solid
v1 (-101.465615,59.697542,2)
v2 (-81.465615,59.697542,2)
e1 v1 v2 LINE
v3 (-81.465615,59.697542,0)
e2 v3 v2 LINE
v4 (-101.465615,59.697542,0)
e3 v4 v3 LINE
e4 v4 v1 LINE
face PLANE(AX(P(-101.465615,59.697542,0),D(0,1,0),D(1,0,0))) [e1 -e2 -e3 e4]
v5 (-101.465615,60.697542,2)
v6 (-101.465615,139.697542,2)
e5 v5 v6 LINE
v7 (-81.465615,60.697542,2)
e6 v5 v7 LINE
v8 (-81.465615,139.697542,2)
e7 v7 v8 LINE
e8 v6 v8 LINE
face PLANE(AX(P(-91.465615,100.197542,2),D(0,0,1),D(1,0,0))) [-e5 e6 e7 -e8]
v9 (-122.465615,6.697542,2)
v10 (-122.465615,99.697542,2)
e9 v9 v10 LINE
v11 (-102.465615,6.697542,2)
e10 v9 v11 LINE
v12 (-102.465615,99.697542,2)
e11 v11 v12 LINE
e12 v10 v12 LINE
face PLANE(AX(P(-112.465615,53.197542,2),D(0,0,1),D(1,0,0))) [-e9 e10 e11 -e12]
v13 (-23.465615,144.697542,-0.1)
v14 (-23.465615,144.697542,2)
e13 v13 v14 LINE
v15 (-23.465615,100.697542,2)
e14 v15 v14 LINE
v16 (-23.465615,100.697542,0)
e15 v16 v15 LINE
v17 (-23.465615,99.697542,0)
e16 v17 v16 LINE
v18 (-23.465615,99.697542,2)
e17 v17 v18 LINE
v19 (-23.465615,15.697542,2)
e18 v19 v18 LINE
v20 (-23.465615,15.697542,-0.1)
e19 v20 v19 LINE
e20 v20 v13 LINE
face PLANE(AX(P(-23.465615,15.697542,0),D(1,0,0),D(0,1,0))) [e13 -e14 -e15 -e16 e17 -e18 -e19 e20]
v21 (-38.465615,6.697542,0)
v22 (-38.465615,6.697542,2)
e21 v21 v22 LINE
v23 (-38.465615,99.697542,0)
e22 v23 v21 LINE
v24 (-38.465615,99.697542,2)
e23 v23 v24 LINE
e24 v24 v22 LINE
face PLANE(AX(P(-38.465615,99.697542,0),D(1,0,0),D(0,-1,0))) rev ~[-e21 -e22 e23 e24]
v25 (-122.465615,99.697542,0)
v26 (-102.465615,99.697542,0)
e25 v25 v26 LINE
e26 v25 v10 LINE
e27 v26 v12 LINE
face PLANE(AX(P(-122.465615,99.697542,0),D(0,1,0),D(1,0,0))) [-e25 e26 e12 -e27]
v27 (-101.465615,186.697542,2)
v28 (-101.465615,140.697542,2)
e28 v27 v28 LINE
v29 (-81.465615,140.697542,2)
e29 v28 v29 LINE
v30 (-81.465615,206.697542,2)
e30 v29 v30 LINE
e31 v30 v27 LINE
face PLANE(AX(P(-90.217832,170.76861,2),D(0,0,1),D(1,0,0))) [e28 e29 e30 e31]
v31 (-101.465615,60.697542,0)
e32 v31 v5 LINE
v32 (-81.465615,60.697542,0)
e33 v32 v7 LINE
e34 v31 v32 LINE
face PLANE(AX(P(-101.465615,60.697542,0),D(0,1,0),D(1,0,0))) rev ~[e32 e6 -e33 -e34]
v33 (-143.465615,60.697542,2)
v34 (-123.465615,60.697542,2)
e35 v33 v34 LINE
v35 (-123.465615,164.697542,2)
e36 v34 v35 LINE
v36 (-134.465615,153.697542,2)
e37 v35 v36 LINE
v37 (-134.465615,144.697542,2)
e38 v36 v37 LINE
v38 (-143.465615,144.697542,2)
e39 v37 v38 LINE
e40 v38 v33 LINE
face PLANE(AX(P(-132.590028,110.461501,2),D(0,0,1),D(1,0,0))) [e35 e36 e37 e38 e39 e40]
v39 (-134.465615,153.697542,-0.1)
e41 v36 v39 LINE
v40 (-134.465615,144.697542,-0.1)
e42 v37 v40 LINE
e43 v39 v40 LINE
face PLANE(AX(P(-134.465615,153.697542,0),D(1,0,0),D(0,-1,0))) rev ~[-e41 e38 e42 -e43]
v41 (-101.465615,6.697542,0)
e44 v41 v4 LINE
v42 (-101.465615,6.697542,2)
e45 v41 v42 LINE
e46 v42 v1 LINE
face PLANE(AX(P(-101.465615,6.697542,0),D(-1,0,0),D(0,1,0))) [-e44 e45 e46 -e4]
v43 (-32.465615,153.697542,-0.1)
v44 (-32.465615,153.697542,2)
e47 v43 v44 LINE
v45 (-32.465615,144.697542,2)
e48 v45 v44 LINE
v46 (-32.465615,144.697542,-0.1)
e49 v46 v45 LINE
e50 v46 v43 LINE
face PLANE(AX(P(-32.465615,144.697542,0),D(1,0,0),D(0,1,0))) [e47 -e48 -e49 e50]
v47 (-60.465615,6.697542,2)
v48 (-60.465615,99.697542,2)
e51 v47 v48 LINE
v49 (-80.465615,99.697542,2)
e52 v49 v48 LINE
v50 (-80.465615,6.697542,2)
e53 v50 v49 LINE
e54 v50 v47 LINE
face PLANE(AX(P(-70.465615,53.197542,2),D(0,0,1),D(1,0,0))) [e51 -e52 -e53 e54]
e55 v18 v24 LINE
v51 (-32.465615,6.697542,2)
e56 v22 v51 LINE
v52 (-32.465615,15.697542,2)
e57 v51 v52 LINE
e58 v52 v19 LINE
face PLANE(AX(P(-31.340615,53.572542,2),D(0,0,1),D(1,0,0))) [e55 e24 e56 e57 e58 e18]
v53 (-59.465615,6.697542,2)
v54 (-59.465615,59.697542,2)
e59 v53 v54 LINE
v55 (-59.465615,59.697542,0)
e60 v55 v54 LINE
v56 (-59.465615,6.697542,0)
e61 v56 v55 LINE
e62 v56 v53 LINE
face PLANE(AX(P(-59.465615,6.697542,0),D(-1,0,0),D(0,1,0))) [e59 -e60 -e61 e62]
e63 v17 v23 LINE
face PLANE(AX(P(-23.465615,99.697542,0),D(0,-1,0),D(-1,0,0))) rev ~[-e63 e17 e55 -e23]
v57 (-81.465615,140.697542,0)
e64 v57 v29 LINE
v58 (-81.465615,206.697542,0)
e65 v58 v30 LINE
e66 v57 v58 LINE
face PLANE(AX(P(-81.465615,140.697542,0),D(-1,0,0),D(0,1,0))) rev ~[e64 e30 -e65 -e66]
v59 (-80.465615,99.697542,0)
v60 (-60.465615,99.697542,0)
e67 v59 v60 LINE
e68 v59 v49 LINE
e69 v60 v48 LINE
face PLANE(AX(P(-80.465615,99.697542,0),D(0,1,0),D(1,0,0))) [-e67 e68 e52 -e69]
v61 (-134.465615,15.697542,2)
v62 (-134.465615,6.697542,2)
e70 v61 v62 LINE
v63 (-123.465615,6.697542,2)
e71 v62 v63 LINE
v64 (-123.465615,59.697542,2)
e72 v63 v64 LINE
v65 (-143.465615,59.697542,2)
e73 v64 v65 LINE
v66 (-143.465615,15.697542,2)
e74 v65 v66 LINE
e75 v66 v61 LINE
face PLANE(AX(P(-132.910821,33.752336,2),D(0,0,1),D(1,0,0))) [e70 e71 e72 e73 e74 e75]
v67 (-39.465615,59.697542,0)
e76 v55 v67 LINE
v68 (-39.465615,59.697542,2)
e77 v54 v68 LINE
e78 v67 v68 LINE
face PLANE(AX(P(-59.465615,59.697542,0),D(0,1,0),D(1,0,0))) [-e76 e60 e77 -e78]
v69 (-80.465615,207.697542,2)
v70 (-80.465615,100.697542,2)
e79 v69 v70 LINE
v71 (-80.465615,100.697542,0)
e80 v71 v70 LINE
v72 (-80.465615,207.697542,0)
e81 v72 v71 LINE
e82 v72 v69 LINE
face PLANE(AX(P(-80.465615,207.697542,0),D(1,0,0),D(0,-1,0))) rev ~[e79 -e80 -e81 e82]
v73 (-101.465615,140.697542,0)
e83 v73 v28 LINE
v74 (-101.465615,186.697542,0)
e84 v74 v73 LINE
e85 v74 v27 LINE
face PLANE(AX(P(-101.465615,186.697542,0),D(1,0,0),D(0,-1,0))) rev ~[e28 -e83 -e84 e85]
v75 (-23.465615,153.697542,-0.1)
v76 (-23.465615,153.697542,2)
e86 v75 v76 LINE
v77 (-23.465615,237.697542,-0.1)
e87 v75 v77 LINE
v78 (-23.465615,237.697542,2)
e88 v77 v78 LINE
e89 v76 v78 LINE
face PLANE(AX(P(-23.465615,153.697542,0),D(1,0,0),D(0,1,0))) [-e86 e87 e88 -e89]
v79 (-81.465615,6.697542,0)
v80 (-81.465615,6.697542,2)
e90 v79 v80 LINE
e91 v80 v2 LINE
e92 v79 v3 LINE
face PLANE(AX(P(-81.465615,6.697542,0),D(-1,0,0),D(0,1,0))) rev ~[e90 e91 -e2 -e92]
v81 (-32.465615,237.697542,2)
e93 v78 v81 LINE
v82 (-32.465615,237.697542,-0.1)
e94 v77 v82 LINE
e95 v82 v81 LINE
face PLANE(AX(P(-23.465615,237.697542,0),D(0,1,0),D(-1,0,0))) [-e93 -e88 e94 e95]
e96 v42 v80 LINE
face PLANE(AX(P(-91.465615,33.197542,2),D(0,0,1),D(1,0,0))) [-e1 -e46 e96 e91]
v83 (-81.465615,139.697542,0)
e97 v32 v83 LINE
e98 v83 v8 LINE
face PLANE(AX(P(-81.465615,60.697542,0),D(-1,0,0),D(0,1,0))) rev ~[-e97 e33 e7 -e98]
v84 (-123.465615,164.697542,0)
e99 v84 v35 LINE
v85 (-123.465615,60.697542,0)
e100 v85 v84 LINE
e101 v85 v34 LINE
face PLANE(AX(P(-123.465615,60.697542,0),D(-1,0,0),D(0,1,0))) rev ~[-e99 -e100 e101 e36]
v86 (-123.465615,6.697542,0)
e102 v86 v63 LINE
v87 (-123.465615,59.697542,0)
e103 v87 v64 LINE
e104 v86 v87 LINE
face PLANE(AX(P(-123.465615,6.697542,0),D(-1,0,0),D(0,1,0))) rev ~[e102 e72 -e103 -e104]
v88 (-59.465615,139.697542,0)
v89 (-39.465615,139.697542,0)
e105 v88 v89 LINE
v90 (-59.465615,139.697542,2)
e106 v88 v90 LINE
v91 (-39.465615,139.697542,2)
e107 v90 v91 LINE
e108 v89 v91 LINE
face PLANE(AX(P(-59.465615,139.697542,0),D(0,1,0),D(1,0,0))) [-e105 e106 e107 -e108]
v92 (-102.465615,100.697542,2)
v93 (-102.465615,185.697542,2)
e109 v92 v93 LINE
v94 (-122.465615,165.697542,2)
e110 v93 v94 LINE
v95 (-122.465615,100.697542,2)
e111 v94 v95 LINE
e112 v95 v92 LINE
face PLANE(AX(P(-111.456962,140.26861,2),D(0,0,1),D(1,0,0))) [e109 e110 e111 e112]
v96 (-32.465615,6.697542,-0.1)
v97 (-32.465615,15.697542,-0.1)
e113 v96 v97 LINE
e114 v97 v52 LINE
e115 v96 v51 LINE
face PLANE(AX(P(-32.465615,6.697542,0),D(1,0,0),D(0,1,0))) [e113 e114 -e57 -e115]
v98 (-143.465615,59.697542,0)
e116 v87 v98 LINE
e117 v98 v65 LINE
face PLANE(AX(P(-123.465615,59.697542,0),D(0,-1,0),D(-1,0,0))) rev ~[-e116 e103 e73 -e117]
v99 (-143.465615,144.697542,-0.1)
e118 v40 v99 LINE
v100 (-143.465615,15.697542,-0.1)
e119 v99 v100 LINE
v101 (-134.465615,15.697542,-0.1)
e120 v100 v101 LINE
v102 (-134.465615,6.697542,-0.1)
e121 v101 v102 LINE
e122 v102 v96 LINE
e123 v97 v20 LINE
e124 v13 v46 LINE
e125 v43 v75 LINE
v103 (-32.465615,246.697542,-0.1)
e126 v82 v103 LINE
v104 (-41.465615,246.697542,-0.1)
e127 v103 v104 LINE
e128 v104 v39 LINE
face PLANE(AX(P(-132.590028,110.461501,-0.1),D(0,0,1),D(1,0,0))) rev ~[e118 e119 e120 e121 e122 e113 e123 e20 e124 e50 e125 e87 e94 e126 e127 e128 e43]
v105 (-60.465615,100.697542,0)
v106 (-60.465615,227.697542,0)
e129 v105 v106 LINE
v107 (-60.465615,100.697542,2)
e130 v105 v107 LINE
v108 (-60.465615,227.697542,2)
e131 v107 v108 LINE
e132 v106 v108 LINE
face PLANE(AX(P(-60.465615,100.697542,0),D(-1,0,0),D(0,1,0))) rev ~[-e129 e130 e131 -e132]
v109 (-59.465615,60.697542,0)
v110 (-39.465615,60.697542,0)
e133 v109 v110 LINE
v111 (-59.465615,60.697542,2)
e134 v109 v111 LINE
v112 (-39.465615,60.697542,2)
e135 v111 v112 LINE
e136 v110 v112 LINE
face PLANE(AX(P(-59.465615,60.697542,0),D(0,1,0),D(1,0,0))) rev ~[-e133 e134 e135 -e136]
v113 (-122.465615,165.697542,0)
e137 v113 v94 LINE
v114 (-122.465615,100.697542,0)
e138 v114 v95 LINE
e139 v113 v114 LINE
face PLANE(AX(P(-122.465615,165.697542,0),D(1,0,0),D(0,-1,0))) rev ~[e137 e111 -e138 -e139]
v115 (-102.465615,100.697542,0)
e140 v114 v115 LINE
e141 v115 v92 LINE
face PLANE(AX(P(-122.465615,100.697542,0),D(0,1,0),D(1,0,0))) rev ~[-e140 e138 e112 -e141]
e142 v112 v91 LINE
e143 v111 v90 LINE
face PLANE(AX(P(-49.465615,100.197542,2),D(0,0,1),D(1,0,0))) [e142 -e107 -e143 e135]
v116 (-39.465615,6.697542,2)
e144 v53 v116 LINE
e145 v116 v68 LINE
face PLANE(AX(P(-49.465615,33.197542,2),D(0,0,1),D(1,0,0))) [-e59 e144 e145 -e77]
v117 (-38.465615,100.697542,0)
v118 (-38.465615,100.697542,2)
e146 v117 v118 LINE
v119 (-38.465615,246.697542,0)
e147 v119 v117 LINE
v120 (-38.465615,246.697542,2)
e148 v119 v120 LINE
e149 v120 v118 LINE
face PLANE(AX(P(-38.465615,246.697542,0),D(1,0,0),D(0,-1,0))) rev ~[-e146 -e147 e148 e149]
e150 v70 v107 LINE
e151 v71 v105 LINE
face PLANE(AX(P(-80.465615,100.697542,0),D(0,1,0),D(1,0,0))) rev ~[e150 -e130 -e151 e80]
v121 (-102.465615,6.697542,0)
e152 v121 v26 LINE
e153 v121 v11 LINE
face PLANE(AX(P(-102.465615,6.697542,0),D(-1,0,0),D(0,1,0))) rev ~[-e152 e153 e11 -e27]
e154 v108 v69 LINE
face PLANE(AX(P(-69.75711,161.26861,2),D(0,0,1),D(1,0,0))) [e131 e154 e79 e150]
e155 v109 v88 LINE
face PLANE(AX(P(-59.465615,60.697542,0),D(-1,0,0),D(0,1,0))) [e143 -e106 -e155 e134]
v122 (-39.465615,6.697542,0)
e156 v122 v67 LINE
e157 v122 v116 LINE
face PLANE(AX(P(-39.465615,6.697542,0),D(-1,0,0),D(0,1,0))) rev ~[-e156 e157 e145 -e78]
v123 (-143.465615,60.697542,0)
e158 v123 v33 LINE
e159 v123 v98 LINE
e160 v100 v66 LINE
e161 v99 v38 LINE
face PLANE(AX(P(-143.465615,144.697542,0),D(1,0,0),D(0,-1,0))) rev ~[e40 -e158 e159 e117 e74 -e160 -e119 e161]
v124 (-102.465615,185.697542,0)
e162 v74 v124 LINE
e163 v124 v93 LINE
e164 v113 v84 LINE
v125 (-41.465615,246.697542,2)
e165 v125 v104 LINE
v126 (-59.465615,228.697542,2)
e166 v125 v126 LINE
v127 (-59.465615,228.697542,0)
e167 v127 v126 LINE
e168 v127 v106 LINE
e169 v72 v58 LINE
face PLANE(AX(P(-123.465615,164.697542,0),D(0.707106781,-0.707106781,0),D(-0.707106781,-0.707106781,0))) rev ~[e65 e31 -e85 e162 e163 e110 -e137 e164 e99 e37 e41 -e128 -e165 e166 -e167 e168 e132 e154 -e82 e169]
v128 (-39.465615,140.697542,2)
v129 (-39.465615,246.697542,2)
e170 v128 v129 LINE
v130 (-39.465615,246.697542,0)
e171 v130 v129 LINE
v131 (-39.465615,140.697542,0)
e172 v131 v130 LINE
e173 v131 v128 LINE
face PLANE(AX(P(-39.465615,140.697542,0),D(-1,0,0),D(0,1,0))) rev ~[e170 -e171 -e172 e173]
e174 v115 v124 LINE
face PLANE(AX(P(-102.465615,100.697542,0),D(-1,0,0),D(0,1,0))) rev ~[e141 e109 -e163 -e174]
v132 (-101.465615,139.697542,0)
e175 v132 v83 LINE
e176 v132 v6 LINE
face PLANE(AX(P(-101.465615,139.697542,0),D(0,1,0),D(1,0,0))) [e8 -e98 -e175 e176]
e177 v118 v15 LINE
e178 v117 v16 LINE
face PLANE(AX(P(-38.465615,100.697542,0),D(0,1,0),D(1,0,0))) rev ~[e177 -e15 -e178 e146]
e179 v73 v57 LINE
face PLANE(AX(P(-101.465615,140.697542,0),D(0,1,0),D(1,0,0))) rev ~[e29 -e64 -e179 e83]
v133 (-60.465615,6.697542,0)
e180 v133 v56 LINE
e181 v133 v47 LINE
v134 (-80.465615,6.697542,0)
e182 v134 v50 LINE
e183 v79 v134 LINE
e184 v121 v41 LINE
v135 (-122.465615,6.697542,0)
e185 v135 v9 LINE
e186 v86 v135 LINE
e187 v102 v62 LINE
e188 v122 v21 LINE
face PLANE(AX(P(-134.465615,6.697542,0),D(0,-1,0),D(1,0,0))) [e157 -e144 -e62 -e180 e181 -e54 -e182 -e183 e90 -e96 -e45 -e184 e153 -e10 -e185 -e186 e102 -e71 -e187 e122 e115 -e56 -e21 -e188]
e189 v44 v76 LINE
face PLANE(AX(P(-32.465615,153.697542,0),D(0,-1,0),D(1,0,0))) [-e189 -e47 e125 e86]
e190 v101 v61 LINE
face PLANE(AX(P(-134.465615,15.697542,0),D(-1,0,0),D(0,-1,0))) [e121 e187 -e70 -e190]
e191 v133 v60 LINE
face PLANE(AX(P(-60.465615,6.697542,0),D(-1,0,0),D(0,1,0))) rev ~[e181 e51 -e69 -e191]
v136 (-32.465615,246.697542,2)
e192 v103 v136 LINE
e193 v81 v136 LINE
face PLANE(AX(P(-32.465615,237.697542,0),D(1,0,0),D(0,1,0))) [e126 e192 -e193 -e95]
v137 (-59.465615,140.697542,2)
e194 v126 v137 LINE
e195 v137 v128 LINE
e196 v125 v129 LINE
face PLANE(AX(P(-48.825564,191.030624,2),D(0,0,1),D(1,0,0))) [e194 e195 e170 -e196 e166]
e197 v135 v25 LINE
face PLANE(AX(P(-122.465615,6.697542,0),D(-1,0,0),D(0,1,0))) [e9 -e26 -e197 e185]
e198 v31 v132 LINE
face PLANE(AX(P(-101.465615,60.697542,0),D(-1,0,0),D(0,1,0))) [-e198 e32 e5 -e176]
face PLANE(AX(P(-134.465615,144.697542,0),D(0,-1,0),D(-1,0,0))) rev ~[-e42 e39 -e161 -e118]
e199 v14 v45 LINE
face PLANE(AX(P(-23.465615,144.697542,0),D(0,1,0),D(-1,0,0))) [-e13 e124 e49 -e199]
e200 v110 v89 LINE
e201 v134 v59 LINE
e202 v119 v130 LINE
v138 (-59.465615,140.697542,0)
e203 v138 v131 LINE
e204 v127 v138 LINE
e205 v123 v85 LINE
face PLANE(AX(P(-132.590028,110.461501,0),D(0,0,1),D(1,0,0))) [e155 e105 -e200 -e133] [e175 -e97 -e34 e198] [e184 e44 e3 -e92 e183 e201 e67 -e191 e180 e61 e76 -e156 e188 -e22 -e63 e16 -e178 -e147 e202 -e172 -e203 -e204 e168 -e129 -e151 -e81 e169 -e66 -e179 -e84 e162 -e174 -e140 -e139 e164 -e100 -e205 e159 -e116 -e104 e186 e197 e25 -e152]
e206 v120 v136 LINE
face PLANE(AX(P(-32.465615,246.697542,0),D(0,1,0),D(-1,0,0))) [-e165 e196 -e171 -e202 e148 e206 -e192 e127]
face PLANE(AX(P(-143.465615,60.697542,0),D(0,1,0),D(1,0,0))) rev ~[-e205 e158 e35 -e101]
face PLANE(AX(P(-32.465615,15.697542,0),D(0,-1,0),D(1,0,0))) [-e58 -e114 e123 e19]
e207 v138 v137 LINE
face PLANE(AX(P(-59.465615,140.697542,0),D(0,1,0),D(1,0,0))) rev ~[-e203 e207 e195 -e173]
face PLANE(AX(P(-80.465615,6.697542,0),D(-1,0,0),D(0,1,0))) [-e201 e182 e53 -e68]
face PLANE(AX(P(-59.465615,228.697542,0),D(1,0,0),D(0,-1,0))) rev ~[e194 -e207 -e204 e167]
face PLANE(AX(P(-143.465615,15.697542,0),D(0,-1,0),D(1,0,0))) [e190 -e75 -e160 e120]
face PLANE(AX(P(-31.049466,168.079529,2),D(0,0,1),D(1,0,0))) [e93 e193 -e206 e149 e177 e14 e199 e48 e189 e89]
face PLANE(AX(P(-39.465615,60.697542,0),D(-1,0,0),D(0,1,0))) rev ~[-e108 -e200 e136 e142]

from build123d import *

# Parameters (mm, degrees)
F0_W     = 20
F0_H     = 93
F0_H_2   = 79
F0_H_3   = 53
F0_H_4   = 1
F0_W_2   = 15
F0_W_3   = 2
F0_H_5   = 9
F0_W_4   = 1
F0_W_5   = 6
F1_DEPTH = 0.1
F2_DEPTH = 2


# Not quite as in the source:
# - a feature names something its author has since deleted; it is built from what else it names


with BuildPart() as f1:
    # F0 (on Top) → F1 (new body)
    with BuildSketch(Plane.XY):
        Polygon((-134.4656153619, 144.6975417137), (-143.4656153619, 144.6975417137), (-143.4656153619, 104.6975417137), (-143.4656153619, 95.6975417137), (-143.4656153619, 64.6975417137), (-143.4656153619, 60.6975417137), (-123.4656153619, 60.6975417137), (-123.4656153619, 164.6975417137), (-134.4656153619, 153.6975417137), align=None)
        Polygon((-123.4656153619, 6.6975417137), (-123.4656153619, 59.6975417137), (-143.4656153619, 59.6975417137), (-143.4656153619, 55.6975417137), (-143.4656153619, 15.6975417137), (-134.4656153619, 15.6975417137), (-134.4656153619, 6.6975417137), align=None)
        with Locations((-112.4656153619, 53.1975417137)):
            Rectangle(F0_W, F0_H)
        Polygon((-102.4656153619, 185.6975417137), (-122.4656153619, 165.6975417137), (-122.4656153619, 100.6975417137), (-102.4656153619, 100.6975417137), align=None)
        Polygon((-81.4656153619, 140.6975417137), (-81.4656153619, 206.6975417137), (-101.4656153619, 186.6975417137), (-101.4656153619, 140.6975417137), align=None)
        with Locations((-91.4656153619, 100.1975417137)):
            Rectangle(F0_W, F0_H_2)
        with Locations((-91.4656153619, 33.1975417137)):
            Rectangle(F0_W, F0_H_3)
        Polygon((-60.4656153619, 100.6975417137), (-60.4656153619, 227.6975417137), (-80.4656153619, 207.6975417137), (-80.4656153619, 100.6975417137), align=None)
        with Locations((-70.4656153619, 53.1975417137)):
            Rectangle(F0_W, F0_H)
        Polygon((-41.4656153619, 237.6975417137), (-41.4656153619, 246.6975417137), (-59.4656153619, 228.6975417137), (-59.4656153619, 140.6975417137), (-39.4656153619, 140.6975417137), (-39.4656153619, 237.6975417137), align=None)
        with Locations((-49.4656153619, 100.1975417137)):
            Rectangle(F0_W, F0_H_2)
        with Locations((-49.4656153619, 33.1975417137)):
            Rectangle(F0_W, F0_H_3)
        with Locations((-133.4656153619, 60.1975417137)):
            Rectangle(F0_W, F0_H_4)
        Polygon((-122.4656153619, 165.6975417137), (-123.4656153619, 164.6975417137), (-123.4656153619, 60.6975417137), (-123.4656153619, 59.6975417137), (-123.4656153619, 6.6975417137), (-122.4656153619, 6.6975417137), (-122.4656153619, 99.6975417137), (-122.4656153619, 100.6975417137), align=None)
        with Locations((-112.4656153619, 100.1975417137)):
            Rectangle(F0_W, F0_H_4)
        Polygon((-101.4656153619, 186.6975417137), (-102.4656153619, 185.6975417137), (-102.4656153619, 100.6975417137), (-102.4656153619, 99.6975417137), (-102.4656153619, 6.6975417137), (-101.4656153619, 6.6975417137), (-101.4656153619, 59.6975417137), (-101.4656153619, 60.6975417137), (-101.4656153619, 139.6975417137), (-101.4656153619, 140.6975417137), align=None)
        with Locations((-91.4656153619, 140.1975417137)):
            Rectangle(F0_W, F0_H_4)
        Polygon((-80.4656153619, 100.6975417137), (-80.4656153619, 207.6975417137), (-81.4656153619, 206.6975417137), (-81.4656153619, 140.6975417137), (-81.4656153619, 139.6975417137), (-81.4656153619, 60.6975417137), (-81.4656153619, 59.6975417137), (-81.4656153619, 6.6975417137), (-80.4656153619, 6.6975417137), (-80.4656153619, 99.6975417137), align=None)
        with Locations((-70.4656153619, 100.1975417137)):
            Rectangle(F0_W, F0_H_4)
        Polygon((-59.4656153619, 140.6975417137), (-59.4656153619, 228.6975417137), (-60.4656153619, 227.6975417137), (-60.4656153619, 100.6975417137), (-60.4656153619, 99.6975417137), (-60.4656153619, 6.6975417137), (-59.4656153619, 6.6975417137), (-59.4656153619, 59.6975417137), (-59.4656153619, 60.6975417137), (-59.4656153619, 139.6975417137), align=None)
        with Locations((-49.4656153619, 60.1975417137)):
            Rectangle(F0_W, F0_H_4)
        with Locations((-49.4656153619, 140.1975417137)):
            Rectangle(F0_W, F0_H_4)
        with Locations((-91.4656153619, 60.1975417137)):
            Rectangle(F0_W, F0_H_4)
        Polygon((-38.4656153619, 237.6975417137), (-39.4656153619, 237.6975417137), (-39.4656153619, 140.6975417137), (-39.4656153619, 139.6975417137), (-39.4656153619, 60.6975417137), (-39.4656153619, 59.6975417137), (-39.4656153619, 6.6975417137), (-38.4656153619, 6.6975417137), (-38.4656153619, 99.6975417137), (-38.4656153619, 100.6975417137), align=None)
        Polygon((-23.4656153619, 99.6975417137), (-38.4656153619, 99.6975417137), (-38.4656153619, 6.6975417137), (-32.4656153619, 6.6975417137), (-32.4656153619, 15.6975417137), (-23.4656153619, 15.6975417137), align=None)
        Polygon((-32.4656153619, 237.6975417137), (-38.4656153619, 237.6975417137), (-38.4656153619, 100.6975417137), (-23.4656153619, 100.6975417137), (-23.4656153619, 144.6975417137), (-32.4656153619, 144.6975417137), (-32.4656153619, 153.6975417137), (-23.4656153619, 153.6975417137), (-23.4656153619, 237.6975417137), align=None)
        with Locations((-30.9656153619, 100.1975417137)):
            Rectangle(F0_W_2, F0_H_4)
        with Locations((-40.4656153619, 242.1975417137)):
            Rectangle(F0_W_3, F0_H_5)
        with Locations((-38.9656153619, 242.1975417137)):
            Rectangle(F0_W_4, F0_H_5)
        with Locations((-35.4656153619, 242.1975417137)):
            Rectangle(F0_W_5, F0_H_5)
    extrude(amount=-F1_DEPTH)

    # F0 (on Top) → F2 (join)
    with BuildSketch(Plane.XY):
        Polygon((-134.4656153619, 144.6975417137), (-143.4656153619, 144.6975417137), (-143.4656153619, 104.6975417137), (-143.4656153619, 95.6975417137), (-143.4656153619, 64.6975417137), (-143.4656153619, 60.6975417137), (-123.4656153619, 60.6975417137), (-123.4656153619, 164.6975417137), (-134.4656153619, 153.6975417137), align=None)
        Polygon((-123.4656153619, 6.6975417137), (-123.4656153619, 59.6975417137), (-143.4656153619, 59.6975417137), (-143.4656153619, 55.6975417137), (-143.4656153619, 15.6975417137), (-134.4656153619, 15.6975417137), (-134.4656153619, 6.6975417137), align=None)
        with Locations((-112.4656153619, 53.1975417137)):
            Rectangle(F0_W, F0_H)
        Polygon((-102.4656153619, 185.6975417137), (-122.4656153619, 165.6975417137), (-122.4656153619, 100.6975417137), (-102.4656153619, 100.6975417137), align=None)
        Polygon((-81.4656153619, 140.6975417137), (-81.4656153619, 206.6975417137), (-101.4656153619, 186.6975417137), (-101.4656153619, 140.6975417137), align=None)
        with Locations((-91.4656153619, 100.1975417137)):
            Rectangle(F0_W, F0_H_2)
        with Locations((-91.4656153619, 33.1975417137)):
            Rectangle(F0_W, F0_H_3)
        with Locations((-70.4656153619, 53.1975417137)):
            Rectangle(F0_W, F0_H)
        Polygon((-60.4656153619, 100.6975417137), (-60.4656153619, 227.6975417137), (-80.4656153619, 207.6975417137), (-80.4656153619, 100.6975417137), align=None)
        Polygon((-41.4656153619, 237.6975417137), (-41.4656153619, 246.6975417137), (-59.4656153619, 228.6975417137), (-59.4656153619, 140.6975417137), (-39.4656153619, 140.6975417137), (-39.4656153619, 237.6975417137), align=None)
        with Locations((-49.4656153619, 100.1975417137)):
            Rectangle(F0_W, F0_H_2)
        with Locations((-49.4656153619, 33.1975417137)):
            Rectangle(F0_W, F0_H_3)
        Polygon((-23.4656153619, 99.6975417137), (-38.4656153619, 99.6975417137), (-38.4656153619, 6.6975417137), (-32.4656153619, 6.6975417137), (-32.4656153619, 15.6975417137), (-23.4656153619, 15.6975417137), align=None)
        Polygon((-32.4656153619, 237.6975417137), (-38.4656153619, 237.6975417137), (-38.4656153619, 100.6975417137), (-23.4656153619, 100.6975417137), (-23.4656153619, 144.6975417137), (-32.4656153619, 144.6975417137), (-32.4656153619, 153.6975417137), (-23.4656153619, 153.6975417137), (-23.4656153619, 237.6975417137), align=None)
        with Locations((-40.4656153619, 242.1975417137)):
            Rectangle(F0_W_3, F0_H_5)
        with Locations((-35.4656153619, 242.1975417137)):
            Rectangle(F0_W_5, F0_H_5)
    extrude(amount=F2_DEPTH)


solid = f1.part
